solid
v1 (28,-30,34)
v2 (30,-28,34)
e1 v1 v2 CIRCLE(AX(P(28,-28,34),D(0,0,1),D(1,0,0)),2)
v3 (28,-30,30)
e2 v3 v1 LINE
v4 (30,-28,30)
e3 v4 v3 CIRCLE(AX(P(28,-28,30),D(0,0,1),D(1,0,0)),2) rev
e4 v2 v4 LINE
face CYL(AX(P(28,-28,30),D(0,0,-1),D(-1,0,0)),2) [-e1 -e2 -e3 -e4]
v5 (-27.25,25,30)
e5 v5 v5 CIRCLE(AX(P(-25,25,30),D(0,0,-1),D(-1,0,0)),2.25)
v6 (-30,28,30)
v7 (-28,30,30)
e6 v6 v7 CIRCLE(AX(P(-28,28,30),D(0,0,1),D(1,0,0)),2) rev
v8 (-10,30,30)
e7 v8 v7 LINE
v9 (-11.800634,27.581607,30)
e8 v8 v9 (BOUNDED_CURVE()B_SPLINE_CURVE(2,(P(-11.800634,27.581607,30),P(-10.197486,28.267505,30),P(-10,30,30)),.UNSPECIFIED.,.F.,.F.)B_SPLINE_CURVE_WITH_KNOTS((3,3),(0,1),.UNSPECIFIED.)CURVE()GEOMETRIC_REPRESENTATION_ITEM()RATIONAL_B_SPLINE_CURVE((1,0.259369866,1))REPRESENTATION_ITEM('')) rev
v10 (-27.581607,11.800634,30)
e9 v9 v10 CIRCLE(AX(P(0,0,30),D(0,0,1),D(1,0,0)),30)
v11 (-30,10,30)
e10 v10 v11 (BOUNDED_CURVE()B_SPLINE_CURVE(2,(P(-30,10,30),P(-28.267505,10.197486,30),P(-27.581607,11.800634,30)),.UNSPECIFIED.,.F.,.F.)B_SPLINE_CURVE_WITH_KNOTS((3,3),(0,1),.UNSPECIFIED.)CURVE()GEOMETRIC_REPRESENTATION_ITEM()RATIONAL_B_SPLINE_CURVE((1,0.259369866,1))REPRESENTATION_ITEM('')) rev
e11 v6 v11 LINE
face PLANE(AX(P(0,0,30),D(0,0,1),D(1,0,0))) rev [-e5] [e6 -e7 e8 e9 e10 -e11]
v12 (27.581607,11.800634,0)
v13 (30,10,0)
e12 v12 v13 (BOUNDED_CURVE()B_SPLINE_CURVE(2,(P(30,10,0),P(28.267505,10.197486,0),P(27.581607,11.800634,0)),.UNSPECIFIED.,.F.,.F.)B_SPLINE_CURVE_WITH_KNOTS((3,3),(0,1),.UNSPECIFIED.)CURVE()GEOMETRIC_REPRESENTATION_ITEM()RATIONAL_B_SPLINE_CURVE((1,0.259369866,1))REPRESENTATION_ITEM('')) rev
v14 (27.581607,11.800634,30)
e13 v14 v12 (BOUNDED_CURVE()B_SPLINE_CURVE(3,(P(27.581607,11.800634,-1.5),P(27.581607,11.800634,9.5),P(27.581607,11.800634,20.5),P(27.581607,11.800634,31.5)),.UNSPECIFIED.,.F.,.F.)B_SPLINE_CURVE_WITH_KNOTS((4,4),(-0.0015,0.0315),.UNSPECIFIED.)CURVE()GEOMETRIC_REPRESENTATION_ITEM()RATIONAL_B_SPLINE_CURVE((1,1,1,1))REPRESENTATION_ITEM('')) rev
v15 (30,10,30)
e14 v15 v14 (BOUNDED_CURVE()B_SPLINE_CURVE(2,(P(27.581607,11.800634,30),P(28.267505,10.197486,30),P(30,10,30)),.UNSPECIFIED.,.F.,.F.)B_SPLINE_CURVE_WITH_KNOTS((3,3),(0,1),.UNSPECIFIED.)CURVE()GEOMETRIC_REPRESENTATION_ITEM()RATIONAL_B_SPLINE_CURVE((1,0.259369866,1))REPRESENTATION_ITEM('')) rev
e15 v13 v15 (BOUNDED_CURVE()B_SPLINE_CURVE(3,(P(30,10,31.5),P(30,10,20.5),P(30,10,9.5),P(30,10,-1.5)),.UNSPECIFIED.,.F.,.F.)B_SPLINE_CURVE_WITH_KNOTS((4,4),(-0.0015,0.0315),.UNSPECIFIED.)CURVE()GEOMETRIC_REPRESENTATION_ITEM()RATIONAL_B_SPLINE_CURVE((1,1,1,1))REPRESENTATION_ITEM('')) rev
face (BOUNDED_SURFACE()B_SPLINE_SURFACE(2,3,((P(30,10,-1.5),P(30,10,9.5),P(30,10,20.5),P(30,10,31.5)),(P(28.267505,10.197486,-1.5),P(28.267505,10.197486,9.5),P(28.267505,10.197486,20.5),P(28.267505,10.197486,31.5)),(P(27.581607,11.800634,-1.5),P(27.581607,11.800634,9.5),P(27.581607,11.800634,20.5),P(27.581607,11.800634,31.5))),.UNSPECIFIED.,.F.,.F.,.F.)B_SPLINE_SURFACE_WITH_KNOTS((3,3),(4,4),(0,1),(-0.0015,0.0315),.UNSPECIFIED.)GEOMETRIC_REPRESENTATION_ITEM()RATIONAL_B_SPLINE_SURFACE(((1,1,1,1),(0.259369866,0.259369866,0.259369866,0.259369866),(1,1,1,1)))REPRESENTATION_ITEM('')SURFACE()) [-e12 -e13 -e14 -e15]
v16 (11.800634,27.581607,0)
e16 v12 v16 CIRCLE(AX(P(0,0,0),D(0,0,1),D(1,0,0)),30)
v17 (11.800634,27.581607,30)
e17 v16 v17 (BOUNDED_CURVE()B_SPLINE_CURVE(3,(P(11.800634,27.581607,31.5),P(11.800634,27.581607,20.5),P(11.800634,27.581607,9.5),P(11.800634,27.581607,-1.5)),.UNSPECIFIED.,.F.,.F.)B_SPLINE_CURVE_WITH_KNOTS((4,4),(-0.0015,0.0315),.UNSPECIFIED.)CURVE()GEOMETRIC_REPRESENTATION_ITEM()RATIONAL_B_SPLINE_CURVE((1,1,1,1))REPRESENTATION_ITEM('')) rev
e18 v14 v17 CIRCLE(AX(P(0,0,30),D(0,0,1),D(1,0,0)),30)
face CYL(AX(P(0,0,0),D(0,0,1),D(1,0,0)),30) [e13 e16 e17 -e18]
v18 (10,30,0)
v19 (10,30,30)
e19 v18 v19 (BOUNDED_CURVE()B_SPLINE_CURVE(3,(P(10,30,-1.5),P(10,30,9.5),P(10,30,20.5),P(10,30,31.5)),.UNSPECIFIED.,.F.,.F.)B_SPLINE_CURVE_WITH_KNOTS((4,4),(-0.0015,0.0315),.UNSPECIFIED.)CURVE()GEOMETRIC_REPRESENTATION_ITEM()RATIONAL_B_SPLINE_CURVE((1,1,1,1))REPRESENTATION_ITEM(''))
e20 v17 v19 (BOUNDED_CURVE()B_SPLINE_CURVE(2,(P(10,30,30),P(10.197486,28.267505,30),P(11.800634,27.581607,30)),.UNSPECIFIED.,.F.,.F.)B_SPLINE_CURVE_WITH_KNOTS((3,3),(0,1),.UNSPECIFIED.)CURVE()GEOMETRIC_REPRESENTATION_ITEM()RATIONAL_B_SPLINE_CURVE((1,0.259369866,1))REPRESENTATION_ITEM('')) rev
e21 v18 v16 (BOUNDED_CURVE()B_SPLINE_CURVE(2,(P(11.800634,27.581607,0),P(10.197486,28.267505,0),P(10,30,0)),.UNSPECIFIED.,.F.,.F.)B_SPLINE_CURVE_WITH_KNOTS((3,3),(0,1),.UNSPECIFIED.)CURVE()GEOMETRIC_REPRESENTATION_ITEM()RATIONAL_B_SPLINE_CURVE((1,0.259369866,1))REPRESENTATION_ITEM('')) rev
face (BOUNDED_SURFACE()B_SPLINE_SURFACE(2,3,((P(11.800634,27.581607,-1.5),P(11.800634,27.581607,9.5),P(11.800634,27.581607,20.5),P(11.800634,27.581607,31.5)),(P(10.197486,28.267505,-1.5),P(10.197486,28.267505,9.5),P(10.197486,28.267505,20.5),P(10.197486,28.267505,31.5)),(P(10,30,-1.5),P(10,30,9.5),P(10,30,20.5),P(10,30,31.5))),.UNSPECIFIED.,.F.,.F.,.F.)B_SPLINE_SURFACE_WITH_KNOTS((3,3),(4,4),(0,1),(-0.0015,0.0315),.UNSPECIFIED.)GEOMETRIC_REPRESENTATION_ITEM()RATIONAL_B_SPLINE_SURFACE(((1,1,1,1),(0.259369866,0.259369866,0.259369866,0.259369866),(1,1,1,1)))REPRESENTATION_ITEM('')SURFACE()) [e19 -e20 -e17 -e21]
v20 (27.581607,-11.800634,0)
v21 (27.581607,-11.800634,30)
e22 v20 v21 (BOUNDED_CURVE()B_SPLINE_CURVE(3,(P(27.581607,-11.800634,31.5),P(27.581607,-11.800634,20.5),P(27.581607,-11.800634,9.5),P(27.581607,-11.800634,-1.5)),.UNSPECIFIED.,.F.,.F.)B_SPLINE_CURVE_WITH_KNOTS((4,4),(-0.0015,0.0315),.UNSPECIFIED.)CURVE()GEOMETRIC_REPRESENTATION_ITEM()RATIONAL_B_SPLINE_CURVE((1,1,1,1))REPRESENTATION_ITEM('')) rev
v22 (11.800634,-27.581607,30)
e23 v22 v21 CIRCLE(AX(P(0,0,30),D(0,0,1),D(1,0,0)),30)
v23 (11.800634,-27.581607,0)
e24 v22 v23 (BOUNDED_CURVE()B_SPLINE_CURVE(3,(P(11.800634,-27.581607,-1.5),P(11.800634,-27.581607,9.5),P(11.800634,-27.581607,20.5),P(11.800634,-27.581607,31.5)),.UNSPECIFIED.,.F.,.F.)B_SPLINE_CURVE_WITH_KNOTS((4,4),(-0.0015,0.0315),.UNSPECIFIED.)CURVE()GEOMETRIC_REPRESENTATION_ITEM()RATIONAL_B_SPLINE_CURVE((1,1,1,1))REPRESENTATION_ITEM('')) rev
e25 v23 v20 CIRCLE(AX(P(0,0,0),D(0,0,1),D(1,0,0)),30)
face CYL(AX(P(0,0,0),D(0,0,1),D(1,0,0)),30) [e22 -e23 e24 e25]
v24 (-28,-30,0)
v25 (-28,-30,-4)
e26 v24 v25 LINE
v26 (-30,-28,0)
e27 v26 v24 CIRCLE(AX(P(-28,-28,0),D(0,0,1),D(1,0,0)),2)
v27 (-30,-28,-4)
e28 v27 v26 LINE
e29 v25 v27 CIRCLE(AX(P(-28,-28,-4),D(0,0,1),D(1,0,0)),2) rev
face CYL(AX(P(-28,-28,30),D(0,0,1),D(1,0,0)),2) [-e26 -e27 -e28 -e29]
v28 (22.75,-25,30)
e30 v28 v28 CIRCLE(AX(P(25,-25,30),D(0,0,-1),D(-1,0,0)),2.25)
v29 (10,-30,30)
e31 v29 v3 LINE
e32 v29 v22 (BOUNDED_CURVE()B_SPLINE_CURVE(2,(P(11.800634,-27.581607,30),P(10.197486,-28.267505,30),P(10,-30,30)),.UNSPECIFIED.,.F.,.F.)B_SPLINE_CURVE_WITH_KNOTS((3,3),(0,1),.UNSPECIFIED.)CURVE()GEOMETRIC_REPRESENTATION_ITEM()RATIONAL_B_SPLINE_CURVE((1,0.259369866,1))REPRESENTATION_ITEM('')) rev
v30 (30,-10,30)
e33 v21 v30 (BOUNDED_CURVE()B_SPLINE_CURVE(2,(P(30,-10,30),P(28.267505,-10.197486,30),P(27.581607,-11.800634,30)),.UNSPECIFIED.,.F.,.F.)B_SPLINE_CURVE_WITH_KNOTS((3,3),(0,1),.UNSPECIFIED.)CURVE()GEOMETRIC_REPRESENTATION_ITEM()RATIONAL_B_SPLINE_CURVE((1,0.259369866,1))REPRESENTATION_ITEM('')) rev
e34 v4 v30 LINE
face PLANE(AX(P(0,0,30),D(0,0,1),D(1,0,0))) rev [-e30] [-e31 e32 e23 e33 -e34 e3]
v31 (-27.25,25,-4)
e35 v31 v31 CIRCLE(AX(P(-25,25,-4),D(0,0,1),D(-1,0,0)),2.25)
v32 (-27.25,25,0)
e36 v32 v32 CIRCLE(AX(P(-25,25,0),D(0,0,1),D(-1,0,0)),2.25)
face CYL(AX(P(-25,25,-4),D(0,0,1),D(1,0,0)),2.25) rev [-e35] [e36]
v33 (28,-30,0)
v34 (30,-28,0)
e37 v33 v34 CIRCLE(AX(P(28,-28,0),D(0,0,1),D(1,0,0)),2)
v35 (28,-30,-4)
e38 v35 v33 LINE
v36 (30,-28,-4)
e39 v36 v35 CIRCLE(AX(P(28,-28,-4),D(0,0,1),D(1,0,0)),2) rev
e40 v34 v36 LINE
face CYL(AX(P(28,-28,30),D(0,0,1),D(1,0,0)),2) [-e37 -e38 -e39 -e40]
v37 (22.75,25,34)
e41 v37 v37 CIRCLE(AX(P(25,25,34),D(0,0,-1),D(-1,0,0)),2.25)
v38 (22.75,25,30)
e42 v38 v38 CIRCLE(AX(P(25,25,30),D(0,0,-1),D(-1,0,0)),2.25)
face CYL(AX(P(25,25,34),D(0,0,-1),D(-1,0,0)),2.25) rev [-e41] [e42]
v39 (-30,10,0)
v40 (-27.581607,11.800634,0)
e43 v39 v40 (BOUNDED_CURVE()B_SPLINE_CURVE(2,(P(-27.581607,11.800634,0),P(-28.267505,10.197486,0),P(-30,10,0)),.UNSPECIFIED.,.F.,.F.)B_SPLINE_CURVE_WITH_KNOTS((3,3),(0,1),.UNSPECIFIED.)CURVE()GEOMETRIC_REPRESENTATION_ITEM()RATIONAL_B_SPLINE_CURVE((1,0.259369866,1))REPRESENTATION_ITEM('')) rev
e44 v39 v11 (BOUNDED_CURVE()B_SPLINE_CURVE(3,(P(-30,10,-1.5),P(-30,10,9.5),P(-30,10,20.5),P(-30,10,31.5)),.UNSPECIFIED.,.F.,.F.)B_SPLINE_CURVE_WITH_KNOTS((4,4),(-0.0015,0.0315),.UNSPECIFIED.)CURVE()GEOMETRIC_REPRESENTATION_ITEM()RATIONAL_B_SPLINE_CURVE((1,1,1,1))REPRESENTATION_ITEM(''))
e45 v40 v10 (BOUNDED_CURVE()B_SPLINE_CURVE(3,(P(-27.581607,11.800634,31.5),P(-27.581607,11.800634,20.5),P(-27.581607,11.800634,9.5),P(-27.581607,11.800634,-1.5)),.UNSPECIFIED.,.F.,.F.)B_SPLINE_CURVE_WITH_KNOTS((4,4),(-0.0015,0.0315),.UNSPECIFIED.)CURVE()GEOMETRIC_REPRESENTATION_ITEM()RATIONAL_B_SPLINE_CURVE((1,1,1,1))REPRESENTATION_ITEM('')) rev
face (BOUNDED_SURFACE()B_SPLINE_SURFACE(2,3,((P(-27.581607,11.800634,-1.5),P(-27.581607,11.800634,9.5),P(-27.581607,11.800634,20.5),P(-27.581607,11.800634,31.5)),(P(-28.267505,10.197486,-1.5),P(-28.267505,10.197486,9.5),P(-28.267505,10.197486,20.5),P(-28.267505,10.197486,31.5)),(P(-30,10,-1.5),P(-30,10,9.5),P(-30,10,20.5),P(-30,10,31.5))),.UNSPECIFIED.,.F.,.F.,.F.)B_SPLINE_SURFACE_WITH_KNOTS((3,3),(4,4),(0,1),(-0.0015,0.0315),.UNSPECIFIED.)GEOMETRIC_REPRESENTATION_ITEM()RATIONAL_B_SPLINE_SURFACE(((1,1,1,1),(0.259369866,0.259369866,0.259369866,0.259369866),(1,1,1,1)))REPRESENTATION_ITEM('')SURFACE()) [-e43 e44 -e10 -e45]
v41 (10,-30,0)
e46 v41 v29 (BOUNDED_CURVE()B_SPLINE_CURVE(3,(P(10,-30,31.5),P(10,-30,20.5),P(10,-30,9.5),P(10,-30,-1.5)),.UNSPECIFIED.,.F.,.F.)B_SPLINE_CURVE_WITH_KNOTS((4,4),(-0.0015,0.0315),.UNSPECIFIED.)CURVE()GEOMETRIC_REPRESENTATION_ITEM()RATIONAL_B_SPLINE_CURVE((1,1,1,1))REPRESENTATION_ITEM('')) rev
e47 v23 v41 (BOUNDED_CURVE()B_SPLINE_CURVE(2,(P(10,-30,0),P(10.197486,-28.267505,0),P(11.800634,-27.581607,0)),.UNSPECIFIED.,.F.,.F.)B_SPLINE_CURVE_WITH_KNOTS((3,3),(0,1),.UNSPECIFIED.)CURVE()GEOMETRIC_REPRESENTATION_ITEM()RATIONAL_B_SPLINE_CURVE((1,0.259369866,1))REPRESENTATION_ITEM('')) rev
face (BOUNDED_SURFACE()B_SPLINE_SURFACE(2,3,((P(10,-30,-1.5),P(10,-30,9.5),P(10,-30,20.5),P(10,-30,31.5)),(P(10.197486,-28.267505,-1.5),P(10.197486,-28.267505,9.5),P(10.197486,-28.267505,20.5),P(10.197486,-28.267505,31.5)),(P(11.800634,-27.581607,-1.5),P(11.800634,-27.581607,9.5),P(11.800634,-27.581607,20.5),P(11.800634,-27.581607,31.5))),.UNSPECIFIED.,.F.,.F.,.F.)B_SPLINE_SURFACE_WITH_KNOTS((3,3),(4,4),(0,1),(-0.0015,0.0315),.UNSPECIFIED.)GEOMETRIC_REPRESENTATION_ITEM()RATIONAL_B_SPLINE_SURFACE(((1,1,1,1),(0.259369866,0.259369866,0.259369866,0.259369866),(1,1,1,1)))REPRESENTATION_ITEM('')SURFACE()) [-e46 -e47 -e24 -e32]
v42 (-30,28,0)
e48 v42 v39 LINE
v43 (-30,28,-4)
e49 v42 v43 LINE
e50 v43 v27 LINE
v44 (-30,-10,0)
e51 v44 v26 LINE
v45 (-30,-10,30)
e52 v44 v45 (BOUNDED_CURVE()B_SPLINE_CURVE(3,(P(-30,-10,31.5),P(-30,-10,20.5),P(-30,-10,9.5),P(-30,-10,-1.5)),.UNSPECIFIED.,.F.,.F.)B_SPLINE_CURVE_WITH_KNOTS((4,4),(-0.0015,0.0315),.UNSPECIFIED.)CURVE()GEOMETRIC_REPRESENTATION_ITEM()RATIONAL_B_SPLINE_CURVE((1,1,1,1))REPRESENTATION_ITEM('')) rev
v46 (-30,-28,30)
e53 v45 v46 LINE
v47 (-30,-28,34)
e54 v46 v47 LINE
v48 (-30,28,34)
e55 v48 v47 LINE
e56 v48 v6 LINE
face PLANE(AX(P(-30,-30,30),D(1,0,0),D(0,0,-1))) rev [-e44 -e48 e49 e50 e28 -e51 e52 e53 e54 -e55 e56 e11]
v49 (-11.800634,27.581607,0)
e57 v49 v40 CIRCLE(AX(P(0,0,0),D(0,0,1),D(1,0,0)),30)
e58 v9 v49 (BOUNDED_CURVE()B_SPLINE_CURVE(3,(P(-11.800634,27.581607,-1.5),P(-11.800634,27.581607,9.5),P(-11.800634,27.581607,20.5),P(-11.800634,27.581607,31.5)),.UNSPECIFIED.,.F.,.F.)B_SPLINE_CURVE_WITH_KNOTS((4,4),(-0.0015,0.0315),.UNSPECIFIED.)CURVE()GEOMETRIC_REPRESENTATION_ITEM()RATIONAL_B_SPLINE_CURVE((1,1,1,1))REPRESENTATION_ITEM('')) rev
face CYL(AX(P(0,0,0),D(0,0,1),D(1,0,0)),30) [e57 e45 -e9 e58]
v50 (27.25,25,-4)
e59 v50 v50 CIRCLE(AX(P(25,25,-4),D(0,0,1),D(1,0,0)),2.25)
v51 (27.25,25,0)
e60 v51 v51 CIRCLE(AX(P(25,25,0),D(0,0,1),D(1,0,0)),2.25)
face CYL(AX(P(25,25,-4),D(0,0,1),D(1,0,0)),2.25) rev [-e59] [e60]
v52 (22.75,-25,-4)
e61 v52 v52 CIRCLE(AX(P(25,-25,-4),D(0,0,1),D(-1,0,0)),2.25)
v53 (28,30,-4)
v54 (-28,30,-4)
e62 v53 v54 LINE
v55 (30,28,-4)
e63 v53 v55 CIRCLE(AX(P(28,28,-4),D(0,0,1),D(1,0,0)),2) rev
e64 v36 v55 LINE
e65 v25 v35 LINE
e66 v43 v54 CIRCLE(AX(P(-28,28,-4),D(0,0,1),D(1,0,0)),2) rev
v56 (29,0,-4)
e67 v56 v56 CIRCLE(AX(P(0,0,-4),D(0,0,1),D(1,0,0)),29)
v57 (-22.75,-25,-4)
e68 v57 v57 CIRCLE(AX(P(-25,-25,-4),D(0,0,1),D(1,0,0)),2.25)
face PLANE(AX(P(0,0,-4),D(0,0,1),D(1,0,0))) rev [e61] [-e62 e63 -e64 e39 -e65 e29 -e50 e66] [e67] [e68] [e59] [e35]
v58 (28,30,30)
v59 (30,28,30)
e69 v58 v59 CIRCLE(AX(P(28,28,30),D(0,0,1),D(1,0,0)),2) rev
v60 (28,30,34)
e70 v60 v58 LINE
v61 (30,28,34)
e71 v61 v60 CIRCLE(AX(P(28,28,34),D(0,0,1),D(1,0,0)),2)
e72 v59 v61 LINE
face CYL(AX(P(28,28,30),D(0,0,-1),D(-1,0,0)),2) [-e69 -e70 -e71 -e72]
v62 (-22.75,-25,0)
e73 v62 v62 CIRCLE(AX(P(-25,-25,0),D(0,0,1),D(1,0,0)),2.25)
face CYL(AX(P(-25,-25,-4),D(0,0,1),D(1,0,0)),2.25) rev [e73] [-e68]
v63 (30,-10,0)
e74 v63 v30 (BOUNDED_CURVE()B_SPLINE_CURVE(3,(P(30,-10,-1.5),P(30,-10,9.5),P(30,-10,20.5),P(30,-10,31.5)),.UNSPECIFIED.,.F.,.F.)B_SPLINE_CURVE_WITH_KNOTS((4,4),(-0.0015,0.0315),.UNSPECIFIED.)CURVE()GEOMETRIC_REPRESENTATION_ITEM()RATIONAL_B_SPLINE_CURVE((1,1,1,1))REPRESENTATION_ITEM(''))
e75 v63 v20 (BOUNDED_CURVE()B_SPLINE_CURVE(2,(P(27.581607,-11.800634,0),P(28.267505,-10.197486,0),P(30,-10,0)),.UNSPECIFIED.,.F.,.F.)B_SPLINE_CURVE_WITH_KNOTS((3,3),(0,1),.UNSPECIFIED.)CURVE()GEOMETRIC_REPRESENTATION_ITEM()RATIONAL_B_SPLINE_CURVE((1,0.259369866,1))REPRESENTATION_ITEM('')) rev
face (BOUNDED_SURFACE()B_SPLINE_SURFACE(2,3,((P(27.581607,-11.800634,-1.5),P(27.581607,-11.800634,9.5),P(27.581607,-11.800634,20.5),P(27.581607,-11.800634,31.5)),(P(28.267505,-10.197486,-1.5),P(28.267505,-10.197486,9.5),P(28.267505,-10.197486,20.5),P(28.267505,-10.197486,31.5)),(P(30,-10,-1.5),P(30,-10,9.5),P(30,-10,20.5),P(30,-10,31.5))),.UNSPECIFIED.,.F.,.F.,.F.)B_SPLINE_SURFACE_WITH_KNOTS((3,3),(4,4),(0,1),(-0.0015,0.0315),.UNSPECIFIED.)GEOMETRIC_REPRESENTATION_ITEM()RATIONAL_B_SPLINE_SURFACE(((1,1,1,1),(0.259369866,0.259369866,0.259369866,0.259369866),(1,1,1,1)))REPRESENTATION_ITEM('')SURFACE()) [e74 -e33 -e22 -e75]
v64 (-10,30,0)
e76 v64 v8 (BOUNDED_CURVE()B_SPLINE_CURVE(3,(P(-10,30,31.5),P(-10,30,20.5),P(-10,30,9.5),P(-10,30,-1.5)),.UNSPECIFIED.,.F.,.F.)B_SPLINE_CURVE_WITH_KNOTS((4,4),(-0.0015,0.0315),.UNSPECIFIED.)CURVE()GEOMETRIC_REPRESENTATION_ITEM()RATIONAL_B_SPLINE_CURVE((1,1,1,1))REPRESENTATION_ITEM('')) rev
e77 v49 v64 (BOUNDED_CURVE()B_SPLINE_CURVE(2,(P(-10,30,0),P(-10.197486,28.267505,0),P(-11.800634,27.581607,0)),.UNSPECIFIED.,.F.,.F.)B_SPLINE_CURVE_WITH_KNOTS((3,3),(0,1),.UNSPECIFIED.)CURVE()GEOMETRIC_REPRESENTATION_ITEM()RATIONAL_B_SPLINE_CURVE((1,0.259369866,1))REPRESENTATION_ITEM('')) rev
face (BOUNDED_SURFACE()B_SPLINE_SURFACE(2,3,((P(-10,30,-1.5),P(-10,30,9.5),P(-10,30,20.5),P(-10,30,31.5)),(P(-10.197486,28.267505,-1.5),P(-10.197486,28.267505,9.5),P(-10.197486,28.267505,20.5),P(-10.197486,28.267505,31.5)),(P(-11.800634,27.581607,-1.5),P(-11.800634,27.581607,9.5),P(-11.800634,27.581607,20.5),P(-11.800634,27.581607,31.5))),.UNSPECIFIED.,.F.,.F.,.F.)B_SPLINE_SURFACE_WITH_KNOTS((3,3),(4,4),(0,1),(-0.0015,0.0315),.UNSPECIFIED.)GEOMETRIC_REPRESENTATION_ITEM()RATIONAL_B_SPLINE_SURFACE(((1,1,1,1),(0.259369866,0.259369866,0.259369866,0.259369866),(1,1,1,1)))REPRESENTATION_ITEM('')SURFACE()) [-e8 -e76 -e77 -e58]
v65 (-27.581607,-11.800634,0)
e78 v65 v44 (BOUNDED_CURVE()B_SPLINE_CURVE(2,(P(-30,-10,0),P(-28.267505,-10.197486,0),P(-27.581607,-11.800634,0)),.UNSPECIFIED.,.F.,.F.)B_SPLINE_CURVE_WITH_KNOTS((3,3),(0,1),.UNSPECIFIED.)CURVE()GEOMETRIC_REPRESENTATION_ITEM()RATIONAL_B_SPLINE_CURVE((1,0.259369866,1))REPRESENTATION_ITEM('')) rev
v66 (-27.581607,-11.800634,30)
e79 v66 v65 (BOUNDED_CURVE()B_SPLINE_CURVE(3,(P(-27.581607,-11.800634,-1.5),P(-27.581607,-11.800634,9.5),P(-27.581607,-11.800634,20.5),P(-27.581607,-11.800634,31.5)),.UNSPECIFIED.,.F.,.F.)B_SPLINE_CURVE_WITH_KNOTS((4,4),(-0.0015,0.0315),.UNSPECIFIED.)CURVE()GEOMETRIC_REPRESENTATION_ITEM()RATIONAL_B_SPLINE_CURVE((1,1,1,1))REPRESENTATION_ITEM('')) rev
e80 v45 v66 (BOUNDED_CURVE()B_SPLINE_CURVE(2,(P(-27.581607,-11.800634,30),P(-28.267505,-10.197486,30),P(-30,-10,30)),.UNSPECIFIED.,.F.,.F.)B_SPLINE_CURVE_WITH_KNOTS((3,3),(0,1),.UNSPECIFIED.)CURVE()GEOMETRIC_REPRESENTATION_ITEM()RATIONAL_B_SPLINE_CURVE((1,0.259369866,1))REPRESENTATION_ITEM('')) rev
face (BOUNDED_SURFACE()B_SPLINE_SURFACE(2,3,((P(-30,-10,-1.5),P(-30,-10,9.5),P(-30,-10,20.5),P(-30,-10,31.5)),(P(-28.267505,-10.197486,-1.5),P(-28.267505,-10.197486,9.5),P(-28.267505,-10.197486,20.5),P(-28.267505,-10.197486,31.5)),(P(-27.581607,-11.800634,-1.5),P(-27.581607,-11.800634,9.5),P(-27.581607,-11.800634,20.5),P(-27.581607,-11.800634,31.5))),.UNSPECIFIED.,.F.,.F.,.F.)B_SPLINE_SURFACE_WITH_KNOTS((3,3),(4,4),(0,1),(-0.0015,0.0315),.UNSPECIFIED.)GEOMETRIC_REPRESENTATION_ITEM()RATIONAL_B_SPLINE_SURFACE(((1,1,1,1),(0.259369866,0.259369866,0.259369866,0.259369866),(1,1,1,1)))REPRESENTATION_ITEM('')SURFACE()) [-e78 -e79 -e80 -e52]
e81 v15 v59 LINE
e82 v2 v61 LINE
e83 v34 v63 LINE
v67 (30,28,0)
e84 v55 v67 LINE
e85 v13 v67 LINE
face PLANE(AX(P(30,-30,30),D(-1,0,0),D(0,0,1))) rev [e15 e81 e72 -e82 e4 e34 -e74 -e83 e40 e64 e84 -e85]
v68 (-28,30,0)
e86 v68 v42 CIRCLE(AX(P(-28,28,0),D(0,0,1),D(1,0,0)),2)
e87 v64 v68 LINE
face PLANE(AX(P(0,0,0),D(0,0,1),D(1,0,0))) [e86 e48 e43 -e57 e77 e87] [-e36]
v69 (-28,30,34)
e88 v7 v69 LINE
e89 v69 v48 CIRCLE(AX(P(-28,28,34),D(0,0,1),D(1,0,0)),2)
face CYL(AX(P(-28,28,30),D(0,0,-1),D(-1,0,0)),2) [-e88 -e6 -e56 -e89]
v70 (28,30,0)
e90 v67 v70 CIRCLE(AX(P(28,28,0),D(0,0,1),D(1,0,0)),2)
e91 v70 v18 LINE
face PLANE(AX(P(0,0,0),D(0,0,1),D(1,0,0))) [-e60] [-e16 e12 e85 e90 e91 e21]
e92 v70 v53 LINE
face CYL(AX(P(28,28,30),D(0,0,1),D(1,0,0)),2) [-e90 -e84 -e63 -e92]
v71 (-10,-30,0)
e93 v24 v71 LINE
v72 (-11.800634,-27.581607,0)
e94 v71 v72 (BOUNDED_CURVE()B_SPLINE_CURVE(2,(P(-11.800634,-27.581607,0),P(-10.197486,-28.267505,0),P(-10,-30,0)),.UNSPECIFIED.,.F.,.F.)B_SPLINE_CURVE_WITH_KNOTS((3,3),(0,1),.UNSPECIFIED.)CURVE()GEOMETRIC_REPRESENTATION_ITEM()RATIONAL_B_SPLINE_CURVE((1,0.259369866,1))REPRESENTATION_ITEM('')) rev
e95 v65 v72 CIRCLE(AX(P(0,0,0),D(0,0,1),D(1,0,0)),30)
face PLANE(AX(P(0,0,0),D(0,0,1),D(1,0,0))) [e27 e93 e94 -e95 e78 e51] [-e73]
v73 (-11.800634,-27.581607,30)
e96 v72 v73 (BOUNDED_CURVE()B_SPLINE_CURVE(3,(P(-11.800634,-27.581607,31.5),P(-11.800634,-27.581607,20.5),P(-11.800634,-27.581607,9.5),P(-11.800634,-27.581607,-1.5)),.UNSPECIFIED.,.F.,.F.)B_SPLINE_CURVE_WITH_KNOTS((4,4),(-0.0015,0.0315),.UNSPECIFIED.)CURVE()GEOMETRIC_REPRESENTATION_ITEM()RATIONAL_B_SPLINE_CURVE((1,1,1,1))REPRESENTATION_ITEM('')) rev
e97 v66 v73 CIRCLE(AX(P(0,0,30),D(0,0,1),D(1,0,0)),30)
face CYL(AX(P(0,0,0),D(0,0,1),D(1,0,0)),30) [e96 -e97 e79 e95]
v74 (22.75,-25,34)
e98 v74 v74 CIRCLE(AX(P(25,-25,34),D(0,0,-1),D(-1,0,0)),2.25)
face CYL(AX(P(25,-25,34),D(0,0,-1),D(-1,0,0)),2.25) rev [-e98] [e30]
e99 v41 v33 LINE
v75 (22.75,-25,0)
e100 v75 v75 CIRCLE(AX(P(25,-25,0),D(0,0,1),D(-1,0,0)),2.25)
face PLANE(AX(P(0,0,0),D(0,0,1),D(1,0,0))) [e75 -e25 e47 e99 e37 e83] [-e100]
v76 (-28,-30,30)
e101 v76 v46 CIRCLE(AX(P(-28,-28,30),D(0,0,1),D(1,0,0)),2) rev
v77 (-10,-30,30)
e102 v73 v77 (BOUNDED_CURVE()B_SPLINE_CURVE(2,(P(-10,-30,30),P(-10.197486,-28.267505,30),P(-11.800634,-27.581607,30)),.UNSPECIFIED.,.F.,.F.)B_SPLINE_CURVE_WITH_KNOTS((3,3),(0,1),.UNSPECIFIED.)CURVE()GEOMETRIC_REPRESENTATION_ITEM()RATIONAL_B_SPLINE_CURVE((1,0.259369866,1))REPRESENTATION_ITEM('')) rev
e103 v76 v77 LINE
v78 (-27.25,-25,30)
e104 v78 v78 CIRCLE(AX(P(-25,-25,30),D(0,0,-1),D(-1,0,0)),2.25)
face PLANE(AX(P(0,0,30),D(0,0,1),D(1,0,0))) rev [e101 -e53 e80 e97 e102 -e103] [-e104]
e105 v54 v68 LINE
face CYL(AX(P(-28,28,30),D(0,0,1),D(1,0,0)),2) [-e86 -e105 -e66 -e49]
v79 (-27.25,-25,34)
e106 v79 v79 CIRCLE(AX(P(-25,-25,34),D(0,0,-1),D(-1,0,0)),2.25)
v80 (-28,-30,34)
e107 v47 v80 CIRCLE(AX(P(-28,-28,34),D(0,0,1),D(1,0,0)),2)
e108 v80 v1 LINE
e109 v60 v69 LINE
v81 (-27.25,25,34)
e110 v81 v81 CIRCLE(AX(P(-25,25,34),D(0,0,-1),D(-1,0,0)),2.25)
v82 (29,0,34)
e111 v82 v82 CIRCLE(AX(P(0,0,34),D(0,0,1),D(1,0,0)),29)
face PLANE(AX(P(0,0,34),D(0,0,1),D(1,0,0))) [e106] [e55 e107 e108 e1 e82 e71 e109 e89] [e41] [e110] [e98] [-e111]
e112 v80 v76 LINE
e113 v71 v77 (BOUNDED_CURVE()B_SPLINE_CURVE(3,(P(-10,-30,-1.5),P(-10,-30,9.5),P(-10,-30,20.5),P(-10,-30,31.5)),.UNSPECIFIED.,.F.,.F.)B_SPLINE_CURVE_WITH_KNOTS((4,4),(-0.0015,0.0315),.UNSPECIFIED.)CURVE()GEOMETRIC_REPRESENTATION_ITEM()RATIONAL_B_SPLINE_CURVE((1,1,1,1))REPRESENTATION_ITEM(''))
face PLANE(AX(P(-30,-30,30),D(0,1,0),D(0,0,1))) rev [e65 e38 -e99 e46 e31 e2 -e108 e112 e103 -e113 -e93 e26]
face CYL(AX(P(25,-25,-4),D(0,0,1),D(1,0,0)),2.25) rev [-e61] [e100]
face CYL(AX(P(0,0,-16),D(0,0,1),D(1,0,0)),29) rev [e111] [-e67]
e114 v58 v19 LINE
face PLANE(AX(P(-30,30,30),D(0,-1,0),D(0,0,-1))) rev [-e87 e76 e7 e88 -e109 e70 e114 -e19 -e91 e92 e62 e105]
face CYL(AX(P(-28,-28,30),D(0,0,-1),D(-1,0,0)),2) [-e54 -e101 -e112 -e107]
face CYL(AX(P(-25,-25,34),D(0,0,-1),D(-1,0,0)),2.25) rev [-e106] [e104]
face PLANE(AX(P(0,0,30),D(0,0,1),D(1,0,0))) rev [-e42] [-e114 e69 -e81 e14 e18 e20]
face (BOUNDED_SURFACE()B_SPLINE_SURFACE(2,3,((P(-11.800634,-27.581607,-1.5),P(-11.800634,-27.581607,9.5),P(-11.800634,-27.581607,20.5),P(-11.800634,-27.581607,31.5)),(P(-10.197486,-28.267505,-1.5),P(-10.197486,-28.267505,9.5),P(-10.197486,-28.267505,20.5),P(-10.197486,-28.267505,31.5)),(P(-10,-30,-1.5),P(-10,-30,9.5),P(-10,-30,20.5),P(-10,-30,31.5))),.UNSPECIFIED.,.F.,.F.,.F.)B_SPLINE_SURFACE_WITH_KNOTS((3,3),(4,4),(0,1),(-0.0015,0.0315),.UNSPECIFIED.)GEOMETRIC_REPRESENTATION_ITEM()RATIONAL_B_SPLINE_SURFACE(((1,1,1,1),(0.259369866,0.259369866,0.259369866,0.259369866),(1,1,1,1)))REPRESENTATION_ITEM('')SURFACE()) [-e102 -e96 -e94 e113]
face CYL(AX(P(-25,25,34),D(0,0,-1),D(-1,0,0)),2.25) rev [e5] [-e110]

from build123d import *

# Parameters (mm, degrees)
SKETCH7_W           = 60
SKETCH7_H           = 60
BOSS_EXTRUDE1_DEPTH = 30
SKETCH8_OUTSIDE_W   = 80
SKETCH8_OUTSIDE_H   = 80
CUT_EXTRUDE1_DEPTH  = 30
FILLET3_DEPTH       = 30
SKETCH6_W           = 60
SKETCH6_H           = 60
SKETCH6_R           = 2.25
BOSS_EXTRUDE2_DEPTH = 4
BOSS_EXTRUDE3_START = 34
SKETCH9_W           = 60
SKETCH9_H           = 60
SKETCH9_R           = 2.25
BOSS_EXTRUDE3_DEPTH = 4
SKETCH11_R          = 29
CUT_EXTRUDE3_DEPTH  = 50
FILLET4_R           = 2


with BuildPart() as part:
    # Sketch7 → Boss-Extrude1 (new body)
    with BuildSketch(Plane.XY):
        Rectangle(SKETCH7_W, SKETCH7_H)
    extrude(amount=BOSS_EXTRUDE1_DEPTH)

    # Sketch8 outside → Cut-Extrude1 (cut)
    with BuildSketch(Plane.XY.offset(30)):
        Rectangle(SKETCH8_OUTSIDE_W, SKETCH8_OUTSIDE_H)
        with BuildLine():
            Line((10, 30), (-10, 30))
            Line((-10, 30), (-10, 28.284271247))
            ThreePointArc((-10, 28.284271247), (-21.213203436, 21.213203436), (-28.284271247, 10))
            Line((-28.284271247, 10), (-30, 10))
            Line((-30, 10), (-30, -10))
            Line((-30, -10), (-28.284271247, -10))
            ThreePointArc((-28.284271247, -10), (-21.213203436, -21.213203436), (-10, -28.284271247))
            Line((-10, -28.284271247), (-10, -30))
            Line((-10, -30), (10, -30))
            Line((10, -30), (10, -28.284271247))
            ThreePointArc((10, -28.284271247), (21.213203436, -21.213203436), (28.284271247, -10))
            Line((28.284271247, -10), (30, -10))
            Line((30, -10), (30, 10))
            Line((30, 10), (28.284271247, 10))
            ThreePointArc((28.284271247, 10), (21.213203436, 21.213203436), (10, 28.284271247))
            Line((10, 28.284271247), (10, 30))
        make_face(mode=Mode.SUBTRACT)
    extrude(amount=-CUT_EXTRUDE1_DEPTH, mode=Mode.SUBTRACT)

    # Fillet3: read off the stored shape, not the designer's step
    # Fillet3 outline → Fillet3 (add)
    with BuildSketch(Plane.XY):
        with BuildLine():
            ThreePointArc((-28.284271247, 10), (-27.947444484, 10.905977573), (-27.581606794, 11.800634164))
            add(Edge.make_bspline(
                [(-27.581606794, 11.800634164), (-28.267504723, 10.197485832), (-30, 10)],
                knots=[0, 0, 0, 1, 1, 1], degree=2, weights=[1, 0.259369866, 1]))
            Line((-30, 10), (-28.284271247, 10))
        make_face()
        with BuildLine():
            add(Edge.make_bspline(
                [(-10, 30), (-10.197485832, 28.267504723), (-11.800634164, 27.581606794)],
                knots=[0, 0, 0, 1, 1, 1], degree=2, weights=[1, 0.259369866, 1]))
            ThreePointArc((-11.800634164, 27.581606794), (-10.905977573, 27.947444484), (-10, 28.284271247))
            Line((-10, 28.284271247), (-10, 30))
        make_face()
        with BuildLine():
            Line((-28.284271247, -10), (-30, -10))
            add(Edge.make_bspline(
                [(-30, -10), (-28.267504723, -10.197485832), (-27.581606794, -11.800634164)],
                knots=[0, 0, 0, 1, 1, 1], degree=2, weights=[1, 0.259369866, 1]))
            ThreePointArc((-27.581606794, -11.800634164), (-27.947444484, -10.905977573), (-28.284271247, -10))
        make_face()
        with BuildLine():
            ThreePointArc((-10, -28.284271247), (-10.905977573, -27.947444484), (-11.800634164, -27.581606794))
            add(Edge.make_bspline(
                [(-11.800634164, -27.581606794), (-10.197485832, -28.267504723), (-10, -30)],
                knots=[0, 0, 0, 1, 1, 1], degree=2, weights=[1, 0.259369866, 1]))
            Line((-10, -30), (-10, -28.284271247))
        make_face()
        with BuildLine():
            Line((10, -28.284271247), (10, -30))
            add(Edge.make_bspline(
                [(10, -30), (10.197485832, -28.267504723), (11.800634164, -27.581606794)],
                knots=[0, 0, 0, 1, 1, 1], degree=2, weights=[1, 0.259369866, 1]))
            ThreePointArc((11.800634164, -27.581606794), (10.905977573, -27.947444484), (10, -28.284271247))
        make_face()
        with BuildLine():
            ThreePointArc((28.284271247, -10), (27.947444484, -10.905977573), (27.581606794, -11.800634164))
            add(Edge.make_bspline(
                [(27.581606794, -11.800634164), (28.267504723, -10.197485832), (30, -10)],
                knots=[0, 0, 0, 1, 1, 1], degree=2, weights=[1, 0.259369866, 1]))
            Line((30, -10), (28.284271247, -10))
        make_face()
        with BuildLine():
            Line((28.284271247, 10), (30, 10))
            add(Edge.make_bspline(
                [(30, 10), (28.267504723, 10.197485832), (27.581606794, 11.800634164)],
                knots=[0, 0, 0, 1, 1, 1], degree=2, weights=[1, 0.259369866, 1]))
            ThreePointArc((27.581606794, 11.800634164), (27.947444484, 10.905977573), (28.284271247, 10))
        make_face()
        with BuildLine():
            ThreePointArc((10, 28.284271247), (10.905977573, 27.947444484), (11.800634164, 27.581606794))
            add(Edge.make_bspline(
                [(11.800634164, 27.581606794), (10.197485832, 28.267504723), (10, 30)],
                knots=[0, 0, 0, 1, 1, 1], degree=2, weights=[1, 0.259369866, 1]))
            Line((10, 30), (10, 28.284271247))
        make_face()
    extrude(amount=FILLET3_DEPTH)

    # Sketch6 → Boss-Extrude2 (add)
    with BuildSketch(Plane.XY):
        Rectangle(SKETCH6_W, SKETCH6_H)
        with Locations((25, 25)):
            Circle(SKETCH6_R, mode=Mode.SUBTRACT)
        with Locations(Location((-25, 25, 0), (0, 0, 180))):
            Circle(SKETCH6_R, mode=Mode.SUBTRACT)
        with Locations((-25, -25)):
            Circle(SKETCH6_R, mode=Mode.SUBTRACT)
        with Locations(Location((25, -25, 0), (0, 0, 180))):
            Circle(SKETCH6_R, mode=Mode.SUBTRACT)
    extrude(amount=-BOSS_EXTRUDE2_DEPTH)

    # Sketch9 → Boss-Extrude3 (add)
    with BuildSketch(Plane.XY.offset(BOSS_EXTRUDE3_START)):
        Rectangle(SKETCH9_W, SKETCH9_H)
        with Locations((25, 25)):
            Circle(SKETCH9_R, mode=Mode.SUBTRACT)
        with Locations(Location((-25, 25, 0), (0, 0, 180))):
            Circle(SKETCH9_R, mode=Mode.SUBTRACT)
        with Locations((-25, -25)):
            Circle(SKETCH9_R, mode=Mode.SUBTRACT)
        with Locations(Location((25, -25, 0), (0, 0, 180))):
            Circle(SKETCH9_R, mode=Mode.SUBTRACT)
    extrude(amount=-BOSS_EXTRUDE3_DEPTH)

    # Sketch11 → Cut-Extrude3 (cut)
    with BuildSketch(Plane.XY.offset(34)):
        Circle(SKETCH11_R)
    extrude(amount=-CUT_EXTRUDE3_DEPTH, mode=Mode.SUBTRACT)

    # Fillet4
    fillet4_edges = [part.edges().sort_by_distance(p)[0] for p in [
        (-30, -30, -2),
        (-30, -30, 32),
        (30, -30, 32),
        (30, -30, -2),
        (30, 30, -2),
        (30, 30, 32),
        (-30, 30, -2),
        (-30, 30, 32),
    ]]
    fillet(fillet4_edges, radius=FILLET4_R)


solid = part.part
